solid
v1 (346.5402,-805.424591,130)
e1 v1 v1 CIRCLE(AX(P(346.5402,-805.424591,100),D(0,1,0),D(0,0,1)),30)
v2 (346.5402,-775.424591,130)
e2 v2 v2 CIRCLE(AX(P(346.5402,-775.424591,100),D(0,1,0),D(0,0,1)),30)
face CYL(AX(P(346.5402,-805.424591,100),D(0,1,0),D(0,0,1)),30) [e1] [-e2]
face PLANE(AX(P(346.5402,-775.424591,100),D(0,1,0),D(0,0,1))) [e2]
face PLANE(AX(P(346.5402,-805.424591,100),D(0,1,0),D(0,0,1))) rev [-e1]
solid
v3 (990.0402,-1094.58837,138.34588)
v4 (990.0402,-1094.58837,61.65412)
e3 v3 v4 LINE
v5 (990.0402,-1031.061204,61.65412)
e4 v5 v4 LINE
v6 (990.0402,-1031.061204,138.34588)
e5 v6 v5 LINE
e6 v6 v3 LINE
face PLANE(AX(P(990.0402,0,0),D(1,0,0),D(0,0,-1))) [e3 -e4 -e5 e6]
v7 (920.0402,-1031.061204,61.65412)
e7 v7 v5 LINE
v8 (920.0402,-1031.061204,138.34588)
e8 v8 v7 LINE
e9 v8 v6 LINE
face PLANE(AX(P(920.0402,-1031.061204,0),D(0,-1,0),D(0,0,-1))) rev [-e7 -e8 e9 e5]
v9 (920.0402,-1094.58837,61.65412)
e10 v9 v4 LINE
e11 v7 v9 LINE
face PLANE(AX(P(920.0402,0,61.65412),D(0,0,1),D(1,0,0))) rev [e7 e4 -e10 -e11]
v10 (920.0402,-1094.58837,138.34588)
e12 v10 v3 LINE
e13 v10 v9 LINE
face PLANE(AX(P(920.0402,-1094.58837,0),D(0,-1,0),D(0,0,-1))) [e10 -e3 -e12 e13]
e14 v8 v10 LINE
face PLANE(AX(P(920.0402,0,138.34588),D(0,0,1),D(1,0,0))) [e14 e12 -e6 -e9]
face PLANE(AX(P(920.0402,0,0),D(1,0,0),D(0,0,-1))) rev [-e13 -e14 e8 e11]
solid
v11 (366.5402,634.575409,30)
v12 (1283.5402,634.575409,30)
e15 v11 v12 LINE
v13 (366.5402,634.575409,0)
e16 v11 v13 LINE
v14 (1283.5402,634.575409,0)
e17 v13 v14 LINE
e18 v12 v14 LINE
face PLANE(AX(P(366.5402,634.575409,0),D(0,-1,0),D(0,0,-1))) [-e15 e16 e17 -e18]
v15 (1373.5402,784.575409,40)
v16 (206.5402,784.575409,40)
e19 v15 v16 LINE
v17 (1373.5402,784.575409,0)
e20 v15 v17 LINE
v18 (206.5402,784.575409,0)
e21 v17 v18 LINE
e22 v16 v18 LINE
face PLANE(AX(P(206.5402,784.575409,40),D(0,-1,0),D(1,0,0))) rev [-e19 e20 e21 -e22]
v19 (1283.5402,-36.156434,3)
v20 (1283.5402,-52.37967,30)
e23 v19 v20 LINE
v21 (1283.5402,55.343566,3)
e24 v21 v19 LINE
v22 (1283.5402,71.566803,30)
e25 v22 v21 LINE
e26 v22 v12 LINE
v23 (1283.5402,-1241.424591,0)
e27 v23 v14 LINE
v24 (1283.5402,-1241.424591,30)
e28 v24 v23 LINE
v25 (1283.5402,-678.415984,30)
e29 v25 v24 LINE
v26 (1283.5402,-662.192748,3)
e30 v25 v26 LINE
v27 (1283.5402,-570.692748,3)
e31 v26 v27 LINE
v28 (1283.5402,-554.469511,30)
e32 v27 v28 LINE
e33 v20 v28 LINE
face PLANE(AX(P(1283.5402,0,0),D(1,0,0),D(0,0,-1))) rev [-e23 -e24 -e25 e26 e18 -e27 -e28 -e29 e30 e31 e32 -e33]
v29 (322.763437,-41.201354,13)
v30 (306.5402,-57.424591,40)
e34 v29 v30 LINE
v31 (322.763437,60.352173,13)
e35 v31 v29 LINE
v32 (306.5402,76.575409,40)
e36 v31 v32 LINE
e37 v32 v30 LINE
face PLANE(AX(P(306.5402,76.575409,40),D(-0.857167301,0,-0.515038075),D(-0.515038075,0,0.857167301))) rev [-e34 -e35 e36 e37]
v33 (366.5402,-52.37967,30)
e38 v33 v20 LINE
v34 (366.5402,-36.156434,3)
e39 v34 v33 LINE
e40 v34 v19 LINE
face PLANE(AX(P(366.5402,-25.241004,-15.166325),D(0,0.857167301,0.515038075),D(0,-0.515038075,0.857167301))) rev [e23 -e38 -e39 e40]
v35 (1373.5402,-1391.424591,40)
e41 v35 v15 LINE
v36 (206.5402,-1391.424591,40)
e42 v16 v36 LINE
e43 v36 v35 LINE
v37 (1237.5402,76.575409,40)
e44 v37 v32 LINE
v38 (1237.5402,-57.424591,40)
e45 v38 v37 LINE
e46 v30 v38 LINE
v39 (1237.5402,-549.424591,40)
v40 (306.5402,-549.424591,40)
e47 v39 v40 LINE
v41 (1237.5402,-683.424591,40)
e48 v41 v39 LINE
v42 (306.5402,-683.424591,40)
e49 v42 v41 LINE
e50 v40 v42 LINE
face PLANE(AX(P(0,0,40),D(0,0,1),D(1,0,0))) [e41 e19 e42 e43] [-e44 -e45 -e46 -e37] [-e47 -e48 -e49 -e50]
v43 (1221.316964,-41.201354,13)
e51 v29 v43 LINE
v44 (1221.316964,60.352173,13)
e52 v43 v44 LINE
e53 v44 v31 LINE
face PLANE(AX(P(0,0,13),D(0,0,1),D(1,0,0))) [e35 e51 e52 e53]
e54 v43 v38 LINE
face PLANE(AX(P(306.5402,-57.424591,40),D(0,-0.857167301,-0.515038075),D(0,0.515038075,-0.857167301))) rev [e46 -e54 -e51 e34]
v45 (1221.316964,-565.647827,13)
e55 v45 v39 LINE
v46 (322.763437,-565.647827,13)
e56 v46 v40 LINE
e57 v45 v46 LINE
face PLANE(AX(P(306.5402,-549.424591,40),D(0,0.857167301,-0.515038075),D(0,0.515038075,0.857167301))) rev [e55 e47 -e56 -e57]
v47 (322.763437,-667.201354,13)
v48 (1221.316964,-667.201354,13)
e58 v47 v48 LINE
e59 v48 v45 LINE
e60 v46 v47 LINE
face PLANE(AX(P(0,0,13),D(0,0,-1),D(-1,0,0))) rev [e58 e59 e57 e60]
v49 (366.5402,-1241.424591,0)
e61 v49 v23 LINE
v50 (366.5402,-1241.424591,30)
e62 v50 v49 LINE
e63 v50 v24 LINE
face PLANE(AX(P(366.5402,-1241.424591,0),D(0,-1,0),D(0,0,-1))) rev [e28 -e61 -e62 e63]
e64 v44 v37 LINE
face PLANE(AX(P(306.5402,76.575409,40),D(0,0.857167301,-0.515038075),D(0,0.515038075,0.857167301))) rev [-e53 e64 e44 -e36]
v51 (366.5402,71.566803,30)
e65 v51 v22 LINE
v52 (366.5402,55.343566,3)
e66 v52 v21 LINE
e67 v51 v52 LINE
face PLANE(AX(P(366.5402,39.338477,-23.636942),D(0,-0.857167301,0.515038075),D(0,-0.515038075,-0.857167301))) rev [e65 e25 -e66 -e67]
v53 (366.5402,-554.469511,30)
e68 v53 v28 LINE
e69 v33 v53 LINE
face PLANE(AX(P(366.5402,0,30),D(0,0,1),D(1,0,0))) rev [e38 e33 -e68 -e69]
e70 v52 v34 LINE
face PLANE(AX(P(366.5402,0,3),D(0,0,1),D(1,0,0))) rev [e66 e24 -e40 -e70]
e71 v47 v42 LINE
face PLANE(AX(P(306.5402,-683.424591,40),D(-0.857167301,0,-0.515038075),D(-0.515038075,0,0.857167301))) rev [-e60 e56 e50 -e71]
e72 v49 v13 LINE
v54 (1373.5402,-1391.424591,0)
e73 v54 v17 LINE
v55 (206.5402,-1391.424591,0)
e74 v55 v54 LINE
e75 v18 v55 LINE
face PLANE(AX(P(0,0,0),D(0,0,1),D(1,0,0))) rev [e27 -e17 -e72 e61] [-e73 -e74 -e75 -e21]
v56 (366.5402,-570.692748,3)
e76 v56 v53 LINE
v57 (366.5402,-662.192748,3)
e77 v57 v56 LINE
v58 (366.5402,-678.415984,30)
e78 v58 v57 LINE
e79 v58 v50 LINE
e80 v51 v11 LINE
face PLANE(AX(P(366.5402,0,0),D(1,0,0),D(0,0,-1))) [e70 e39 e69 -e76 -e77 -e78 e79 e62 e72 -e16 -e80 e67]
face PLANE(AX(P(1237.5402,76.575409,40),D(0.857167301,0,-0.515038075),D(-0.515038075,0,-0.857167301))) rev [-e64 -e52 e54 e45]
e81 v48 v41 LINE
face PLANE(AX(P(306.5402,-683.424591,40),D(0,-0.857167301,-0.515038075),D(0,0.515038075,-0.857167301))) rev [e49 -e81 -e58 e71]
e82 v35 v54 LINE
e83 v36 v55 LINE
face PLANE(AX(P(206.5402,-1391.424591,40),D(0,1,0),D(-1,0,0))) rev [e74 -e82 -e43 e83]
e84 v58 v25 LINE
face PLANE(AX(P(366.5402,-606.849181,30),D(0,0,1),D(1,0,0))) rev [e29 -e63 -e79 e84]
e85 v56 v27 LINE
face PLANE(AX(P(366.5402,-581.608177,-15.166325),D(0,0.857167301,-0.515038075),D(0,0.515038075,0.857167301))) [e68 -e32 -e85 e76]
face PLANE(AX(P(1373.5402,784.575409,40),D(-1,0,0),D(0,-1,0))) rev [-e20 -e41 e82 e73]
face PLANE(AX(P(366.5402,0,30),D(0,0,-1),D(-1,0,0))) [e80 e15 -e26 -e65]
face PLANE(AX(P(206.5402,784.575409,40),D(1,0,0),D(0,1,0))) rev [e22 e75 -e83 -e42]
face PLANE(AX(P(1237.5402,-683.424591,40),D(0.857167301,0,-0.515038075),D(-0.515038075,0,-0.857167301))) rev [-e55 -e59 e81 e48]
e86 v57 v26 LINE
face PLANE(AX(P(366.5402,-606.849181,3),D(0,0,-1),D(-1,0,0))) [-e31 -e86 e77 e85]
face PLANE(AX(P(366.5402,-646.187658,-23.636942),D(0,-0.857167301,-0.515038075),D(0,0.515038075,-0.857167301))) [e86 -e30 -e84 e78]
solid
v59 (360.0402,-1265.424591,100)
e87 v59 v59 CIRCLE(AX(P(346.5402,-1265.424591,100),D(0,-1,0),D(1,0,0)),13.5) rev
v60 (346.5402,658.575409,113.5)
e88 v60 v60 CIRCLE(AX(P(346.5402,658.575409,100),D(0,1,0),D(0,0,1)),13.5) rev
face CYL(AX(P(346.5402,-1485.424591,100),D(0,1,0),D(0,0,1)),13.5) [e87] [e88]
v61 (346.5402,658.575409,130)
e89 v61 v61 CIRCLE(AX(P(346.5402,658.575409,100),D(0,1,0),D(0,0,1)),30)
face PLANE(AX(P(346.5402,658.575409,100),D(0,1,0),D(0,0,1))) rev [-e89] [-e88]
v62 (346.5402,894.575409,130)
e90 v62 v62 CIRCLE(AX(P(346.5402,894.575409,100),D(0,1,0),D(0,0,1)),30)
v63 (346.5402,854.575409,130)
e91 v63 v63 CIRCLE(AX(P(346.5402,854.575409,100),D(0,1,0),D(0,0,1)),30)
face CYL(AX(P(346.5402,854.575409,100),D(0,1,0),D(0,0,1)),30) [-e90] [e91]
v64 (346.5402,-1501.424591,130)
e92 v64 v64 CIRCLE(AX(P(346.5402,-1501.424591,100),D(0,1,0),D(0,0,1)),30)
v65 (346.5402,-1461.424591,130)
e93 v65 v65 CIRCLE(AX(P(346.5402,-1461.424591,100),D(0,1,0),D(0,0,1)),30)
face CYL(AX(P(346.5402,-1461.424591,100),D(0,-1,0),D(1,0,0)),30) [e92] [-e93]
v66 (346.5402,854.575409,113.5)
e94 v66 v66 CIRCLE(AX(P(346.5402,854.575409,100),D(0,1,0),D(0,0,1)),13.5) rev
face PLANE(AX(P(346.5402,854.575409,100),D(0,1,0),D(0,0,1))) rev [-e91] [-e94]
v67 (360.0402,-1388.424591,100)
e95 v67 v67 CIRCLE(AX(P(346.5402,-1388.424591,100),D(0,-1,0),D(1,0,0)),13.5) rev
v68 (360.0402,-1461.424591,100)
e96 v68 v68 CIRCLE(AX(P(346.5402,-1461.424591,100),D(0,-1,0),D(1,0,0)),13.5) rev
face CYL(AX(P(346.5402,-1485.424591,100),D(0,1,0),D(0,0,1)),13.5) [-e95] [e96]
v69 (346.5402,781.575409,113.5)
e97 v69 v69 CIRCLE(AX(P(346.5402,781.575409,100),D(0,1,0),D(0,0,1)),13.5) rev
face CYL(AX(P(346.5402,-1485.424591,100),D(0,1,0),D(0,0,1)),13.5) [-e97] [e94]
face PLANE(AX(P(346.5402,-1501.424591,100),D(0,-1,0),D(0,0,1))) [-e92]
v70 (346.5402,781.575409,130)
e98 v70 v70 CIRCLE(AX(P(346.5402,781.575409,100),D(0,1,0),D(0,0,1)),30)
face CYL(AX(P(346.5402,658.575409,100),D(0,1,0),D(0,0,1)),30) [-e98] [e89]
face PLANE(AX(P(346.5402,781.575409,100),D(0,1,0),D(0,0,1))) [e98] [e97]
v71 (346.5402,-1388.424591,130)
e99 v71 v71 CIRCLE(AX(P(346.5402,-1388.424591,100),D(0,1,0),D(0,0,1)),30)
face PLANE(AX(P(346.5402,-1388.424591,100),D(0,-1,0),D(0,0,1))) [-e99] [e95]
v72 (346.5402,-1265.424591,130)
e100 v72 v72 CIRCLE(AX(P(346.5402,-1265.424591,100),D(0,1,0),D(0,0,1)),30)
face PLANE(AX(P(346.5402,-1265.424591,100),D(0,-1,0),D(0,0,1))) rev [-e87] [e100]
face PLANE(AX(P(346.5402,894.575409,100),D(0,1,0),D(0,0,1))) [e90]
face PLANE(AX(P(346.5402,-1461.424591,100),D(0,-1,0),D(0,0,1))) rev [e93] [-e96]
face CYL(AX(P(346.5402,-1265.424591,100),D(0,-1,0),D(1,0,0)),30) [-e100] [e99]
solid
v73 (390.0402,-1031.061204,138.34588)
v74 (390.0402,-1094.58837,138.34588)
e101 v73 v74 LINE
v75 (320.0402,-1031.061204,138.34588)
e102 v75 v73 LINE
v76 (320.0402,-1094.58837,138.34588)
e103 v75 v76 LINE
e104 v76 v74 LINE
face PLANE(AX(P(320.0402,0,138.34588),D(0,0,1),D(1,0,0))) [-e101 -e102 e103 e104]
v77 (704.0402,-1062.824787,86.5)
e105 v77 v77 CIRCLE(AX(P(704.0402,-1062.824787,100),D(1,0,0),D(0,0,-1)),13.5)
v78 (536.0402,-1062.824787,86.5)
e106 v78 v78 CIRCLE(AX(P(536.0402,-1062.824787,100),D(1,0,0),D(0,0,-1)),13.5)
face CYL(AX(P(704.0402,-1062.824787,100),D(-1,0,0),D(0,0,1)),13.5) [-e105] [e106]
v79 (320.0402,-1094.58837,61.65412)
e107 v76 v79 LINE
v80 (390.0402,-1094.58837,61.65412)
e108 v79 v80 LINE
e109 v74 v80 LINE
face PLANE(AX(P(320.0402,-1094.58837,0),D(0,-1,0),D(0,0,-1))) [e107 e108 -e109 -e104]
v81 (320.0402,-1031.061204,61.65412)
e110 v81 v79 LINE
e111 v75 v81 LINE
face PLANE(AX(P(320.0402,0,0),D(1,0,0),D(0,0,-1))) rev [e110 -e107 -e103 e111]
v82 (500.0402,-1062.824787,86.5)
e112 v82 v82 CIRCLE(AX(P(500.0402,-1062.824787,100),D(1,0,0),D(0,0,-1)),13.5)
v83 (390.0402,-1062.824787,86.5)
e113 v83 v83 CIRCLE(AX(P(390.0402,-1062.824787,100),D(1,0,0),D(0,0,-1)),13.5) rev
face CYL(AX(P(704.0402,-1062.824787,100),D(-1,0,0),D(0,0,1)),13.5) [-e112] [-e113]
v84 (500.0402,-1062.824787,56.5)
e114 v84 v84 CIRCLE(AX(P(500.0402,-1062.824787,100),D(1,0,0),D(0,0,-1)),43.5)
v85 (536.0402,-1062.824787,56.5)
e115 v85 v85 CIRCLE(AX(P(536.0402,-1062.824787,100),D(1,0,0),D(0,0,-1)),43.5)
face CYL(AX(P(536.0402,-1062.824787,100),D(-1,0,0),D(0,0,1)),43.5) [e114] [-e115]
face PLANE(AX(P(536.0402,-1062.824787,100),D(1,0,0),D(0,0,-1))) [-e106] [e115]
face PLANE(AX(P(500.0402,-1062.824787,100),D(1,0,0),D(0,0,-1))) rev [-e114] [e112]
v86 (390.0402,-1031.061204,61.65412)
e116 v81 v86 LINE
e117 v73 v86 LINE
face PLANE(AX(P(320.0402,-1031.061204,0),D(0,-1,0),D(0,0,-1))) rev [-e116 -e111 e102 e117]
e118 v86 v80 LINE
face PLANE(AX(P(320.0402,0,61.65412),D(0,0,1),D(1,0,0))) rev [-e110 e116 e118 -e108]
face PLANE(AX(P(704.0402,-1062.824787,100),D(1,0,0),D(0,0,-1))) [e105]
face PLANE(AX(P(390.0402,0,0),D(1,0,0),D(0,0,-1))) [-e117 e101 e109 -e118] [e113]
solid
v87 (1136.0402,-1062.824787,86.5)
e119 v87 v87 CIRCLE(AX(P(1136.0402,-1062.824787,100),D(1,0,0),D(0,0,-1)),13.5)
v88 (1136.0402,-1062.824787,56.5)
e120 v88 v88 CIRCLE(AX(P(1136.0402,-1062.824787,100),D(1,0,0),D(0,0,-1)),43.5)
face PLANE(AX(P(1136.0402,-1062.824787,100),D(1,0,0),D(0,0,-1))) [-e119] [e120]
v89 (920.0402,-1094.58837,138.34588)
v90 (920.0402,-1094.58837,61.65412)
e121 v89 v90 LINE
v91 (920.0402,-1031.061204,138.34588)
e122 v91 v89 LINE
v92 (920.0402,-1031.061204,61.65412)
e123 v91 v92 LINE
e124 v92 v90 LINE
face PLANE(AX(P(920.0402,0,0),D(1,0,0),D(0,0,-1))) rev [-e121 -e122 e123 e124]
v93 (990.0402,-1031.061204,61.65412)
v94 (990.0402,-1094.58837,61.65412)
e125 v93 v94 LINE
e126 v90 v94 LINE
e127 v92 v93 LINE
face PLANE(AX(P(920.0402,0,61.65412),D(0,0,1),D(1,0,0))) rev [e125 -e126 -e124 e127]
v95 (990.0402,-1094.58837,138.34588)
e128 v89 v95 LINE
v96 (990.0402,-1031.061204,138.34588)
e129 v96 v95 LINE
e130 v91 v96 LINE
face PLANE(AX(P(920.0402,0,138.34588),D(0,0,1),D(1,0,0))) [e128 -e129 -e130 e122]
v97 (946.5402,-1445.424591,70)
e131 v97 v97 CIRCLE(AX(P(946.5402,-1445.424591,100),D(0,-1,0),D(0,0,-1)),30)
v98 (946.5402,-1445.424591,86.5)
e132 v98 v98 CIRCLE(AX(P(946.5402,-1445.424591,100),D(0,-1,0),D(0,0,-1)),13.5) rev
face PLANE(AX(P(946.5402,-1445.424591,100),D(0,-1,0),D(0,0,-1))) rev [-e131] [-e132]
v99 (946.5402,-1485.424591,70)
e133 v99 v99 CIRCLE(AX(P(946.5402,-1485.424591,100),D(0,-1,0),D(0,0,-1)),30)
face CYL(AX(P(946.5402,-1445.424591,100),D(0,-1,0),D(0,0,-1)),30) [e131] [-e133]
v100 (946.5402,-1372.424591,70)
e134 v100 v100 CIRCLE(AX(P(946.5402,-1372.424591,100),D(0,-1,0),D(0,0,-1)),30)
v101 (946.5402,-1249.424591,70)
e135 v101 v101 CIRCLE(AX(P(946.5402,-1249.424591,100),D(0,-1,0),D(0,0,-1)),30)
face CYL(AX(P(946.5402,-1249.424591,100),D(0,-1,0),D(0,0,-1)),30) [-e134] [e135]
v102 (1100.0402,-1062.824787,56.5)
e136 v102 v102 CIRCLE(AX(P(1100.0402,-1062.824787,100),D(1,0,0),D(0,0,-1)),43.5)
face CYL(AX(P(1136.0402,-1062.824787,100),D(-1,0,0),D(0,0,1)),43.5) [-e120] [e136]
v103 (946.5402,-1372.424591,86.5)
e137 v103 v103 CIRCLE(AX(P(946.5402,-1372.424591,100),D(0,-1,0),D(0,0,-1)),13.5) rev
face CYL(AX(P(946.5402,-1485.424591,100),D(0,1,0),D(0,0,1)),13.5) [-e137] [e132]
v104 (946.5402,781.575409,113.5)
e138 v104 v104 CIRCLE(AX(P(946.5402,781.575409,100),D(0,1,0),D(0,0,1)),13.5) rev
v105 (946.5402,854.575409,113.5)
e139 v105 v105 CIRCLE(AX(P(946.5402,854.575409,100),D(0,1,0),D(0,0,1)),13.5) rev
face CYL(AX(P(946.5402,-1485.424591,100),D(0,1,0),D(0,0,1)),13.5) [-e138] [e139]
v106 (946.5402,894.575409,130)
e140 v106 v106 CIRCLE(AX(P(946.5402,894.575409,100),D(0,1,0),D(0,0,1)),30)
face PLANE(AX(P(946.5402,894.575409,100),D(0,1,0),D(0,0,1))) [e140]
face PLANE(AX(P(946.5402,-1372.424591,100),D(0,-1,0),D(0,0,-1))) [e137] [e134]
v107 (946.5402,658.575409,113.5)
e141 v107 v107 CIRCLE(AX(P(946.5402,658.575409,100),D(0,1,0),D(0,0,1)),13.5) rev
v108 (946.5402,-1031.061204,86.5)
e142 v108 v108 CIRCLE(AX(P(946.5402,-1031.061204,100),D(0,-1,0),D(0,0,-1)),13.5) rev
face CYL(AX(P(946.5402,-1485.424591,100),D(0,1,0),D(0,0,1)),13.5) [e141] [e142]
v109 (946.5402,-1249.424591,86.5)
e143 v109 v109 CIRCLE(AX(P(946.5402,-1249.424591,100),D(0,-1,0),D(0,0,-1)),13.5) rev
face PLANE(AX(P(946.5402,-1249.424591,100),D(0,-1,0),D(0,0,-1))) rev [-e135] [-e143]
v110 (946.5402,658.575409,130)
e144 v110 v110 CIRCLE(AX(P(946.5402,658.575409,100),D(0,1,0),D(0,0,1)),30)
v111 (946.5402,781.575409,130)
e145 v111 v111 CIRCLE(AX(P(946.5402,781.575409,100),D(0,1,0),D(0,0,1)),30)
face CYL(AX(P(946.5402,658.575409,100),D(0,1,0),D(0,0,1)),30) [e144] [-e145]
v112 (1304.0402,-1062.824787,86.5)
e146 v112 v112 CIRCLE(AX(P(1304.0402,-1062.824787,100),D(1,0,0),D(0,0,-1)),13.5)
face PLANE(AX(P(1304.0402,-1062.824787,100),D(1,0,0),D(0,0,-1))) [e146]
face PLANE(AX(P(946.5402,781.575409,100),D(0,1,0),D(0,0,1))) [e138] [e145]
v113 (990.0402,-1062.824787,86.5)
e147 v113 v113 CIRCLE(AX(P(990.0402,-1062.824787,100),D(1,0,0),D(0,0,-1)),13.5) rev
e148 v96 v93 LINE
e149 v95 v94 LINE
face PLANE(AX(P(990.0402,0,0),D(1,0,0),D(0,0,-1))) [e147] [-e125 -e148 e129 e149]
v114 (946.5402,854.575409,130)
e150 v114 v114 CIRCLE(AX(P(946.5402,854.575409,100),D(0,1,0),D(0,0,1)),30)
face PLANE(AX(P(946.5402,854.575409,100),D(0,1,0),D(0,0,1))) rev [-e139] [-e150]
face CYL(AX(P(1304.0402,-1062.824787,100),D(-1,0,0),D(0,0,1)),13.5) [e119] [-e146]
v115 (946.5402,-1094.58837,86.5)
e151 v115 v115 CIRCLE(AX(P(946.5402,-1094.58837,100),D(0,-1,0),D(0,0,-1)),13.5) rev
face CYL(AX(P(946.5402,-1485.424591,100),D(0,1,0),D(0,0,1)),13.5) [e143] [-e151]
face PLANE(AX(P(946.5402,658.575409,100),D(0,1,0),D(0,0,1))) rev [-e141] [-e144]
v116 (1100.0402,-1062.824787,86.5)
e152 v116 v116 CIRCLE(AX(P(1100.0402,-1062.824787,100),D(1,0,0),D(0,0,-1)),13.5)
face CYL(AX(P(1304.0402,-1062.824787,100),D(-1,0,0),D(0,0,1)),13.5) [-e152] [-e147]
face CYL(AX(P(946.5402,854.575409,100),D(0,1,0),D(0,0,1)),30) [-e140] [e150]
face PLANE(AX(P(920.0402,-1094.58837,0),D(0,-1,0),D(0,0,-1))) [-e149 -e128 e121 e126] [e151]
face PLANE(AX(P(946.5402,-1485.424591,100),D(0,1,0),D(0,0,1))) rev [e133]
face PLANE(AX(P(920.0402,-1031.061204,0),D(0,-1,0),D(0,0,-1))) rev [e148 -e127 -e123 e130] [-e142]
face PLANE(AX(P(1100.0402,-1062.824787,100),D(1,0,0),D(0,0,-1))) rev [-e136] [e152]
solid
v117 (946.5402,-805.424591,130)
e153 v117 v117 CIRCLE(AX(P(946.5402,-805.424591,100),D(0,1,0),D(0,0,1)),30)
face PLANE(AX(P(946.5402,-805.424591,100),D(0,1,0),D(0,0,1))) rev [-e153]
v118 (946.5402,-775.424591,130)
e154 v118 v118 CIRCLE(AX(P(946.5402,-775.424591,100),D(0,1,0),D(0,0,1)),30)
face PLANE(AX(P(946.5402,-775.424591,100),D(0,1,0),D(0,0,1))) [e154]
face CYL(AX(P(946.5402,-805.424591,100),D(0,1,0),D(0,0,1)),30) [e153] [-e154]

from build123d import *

# Parameters (mm, degrees)
SKETCH1_W                    = 1167
SKETCH1_H                    = 2176
BOSS_EXTRUDE1_DEPTH          = 40
SKETCH2_W                    = 931
SKETCH2_H                    = 134
CUT_EXTRUDE1_DEPTH           = 27
CUT_EXTRUDE1_DRAFT           = -31
CUT_EXTRUDE1_PROFILE_2_DEPTH = 27
CUT_EXTRUDE1_PROFILE_2_DRAFT = -31
CUT_EXTRUDE2_START           = -90
CUT_EXTRUDE2_DEPTH           = 917
BOSS_EXTRUDE2_START          = 110
SKETCH4_R                    = 13.5
BOSS_EXTRUDE2_DEPTH          = 2380
SKETCH5_R                    = 30
BOSS_EXTRUDE3_DEPTH          = 40
BOSS_EXTRUDE4_START          = -113
SKETCH6_R                    = 30
BOSS_EXTRUDE4_DEPTH          = 123
BOSS_EXTRUDE5_START          = -40
SKETCH8_W                    = 76.691760354
SKETCH8_H                    = 63.527166665
BOSS_EXTRUDE5_DEPTH          = 70
SKETCH9_R                    = 13.5
BOSS_EXTRUDE6_DEPTH          = 344
BOSS_EXTRUDE7_START          = 140
SKETCH10_R                   = 43.5
BOSS_EXTRUDE7_DEPTH          = 36
BOSS_EXTRUDE8_START          = -1670
SKETCH11_R                   = 30
BOSS_EXTRUDE8_DEPTH          = 30
LPATTERN2_COUNT              = 2
LPATTERN2_PITCH              = 600
LPATTERN3_START              = -805.424590627
LPATTERN3_OUTLINE_R          = 30
LPATTERN3_DEPTH              = 30
LPATTERN3_START_2            = 61.654119823
LPATTERN3_2_OUTLINE_W        = 70
LPATTERN3_2_OUTLINE_H        = 63.527166665
LPATTERN3_2_DEPTH            = 76.691760354
LPATTERN3_START_3            = 920.040200233
LPATTERN3_3_OUTLINE_W        = 63.527166665
LPATTERN3_3_OUTLINE_H        = 76.691760354
LPATTERN3_3_DEPTH            = 70
LPATTERN3_START_4            = 1100.040200233
LPATTERN3_4_OUTLINE_R        = 43.5
LPATTERN3_4_DEPTH            = 36
LPATTERN3_START_5            = 990.040200233
LPATTERN3_5_OUTLINE_R        = 13.5
LPATTERN3_5_DEPTH            = 314
LPATTERN3_START_6            = 658.575409373
LPATTERN3_6_OUTLINE_R        = 30
LPATTERN3_6_DEPTH            = 123
LPATTERN3_START_7            = 854.575409373
LPATTERN3_7_OUTLINE_R        = 30
LPATTERN3_7_DEPTH            = 40
SKETCH12_R                   = 30
BOSS_EXTRUDE9_DEPTH          = 40
BOSS_EXTRUDE10_START         = -113
SKETCH13_R                   = 30
BOSS_EXTRUDE10_DEPTH         = 123


# Read off the part's stored shape, not the designer's step: LPattern3
with BuildPart() as part:
    # Sketch1 → Boss-Extrude1 (new body)
    with BuildSketch(Plane.XY):
        with Locations((790.040200233, -303.424590627)):
            Rectangle(SKETCH1_W, SKETCH1_H)
    extrude(amount=BOSS_EXTRUDE1_DEPTH)


with BuildPart() as cut_extrude1_tool:
    # Sketch2 → Cut-Extrude1 (with draft: the straight prism first)
    with BuildSketch(Plane.XY.offset(40)):
        with Locations((772.040200233, 9.575409373)):
            Rectangle(SKETCH2_W, SKETCH2_H)
    extrude(amount=-CUT_EXTRUDE1_DEPTH)
    # Cut-Extrude1: the draft: its side faces are tilted about the plane it starts from
    cut_extrude1_sides = [cut_extrude1_tool.faces().sort_by_distance(p)[0] for p in [
        (306.540200233, 9.575409373, 26.5),
        (772.040200233, -57.424590627, 26.5),
        (1237.540200233, 9.575409373, 26.5),
        (772.040200233, 76.575409373, 26.5),
    ]]
    draft(cut_extrude1_sides, Plane.XY.offset(40), CUT_EXTRUDE1_DRAFT)


with BuildPart() as part_1:
    add(part.part)

    # Cut-Extrude1: cut by cut_extrude1_tool
    add(cut_extrude1_tool.part, mode=Mode.SUBTRACT)


with BuildPart() as cut_extrude1_profile_2_tool:
    # Sketch2 → Cut-Extrude1 profile 2 (with draft: the straight prism first)
    with BuildSketch(Plane.XY.offset(40)):
        with Locations((772.040200233, -616.424590627)):
            Rectangle(SKETCH2_W, SKETCH2_H)
    extrude(amount=-CUT_EXTRUDE1_PROFILE_2_DEPTH)
    # Cut-Extrude1 profile 2: the draft: its side faces are tilted about the plane it starts from
    cut_extrude1_profile_2_sides = [cut_extrude1_profile_2_tool.faces().sort_by_distance(p)[0] for p in [
        (306.540200233, -616.424590627, 26.5),
        (772.040200233, -683.424590627, 26.5),
        (1237.540200233, -616.424590627, 26.5),
        (772.040200233, -549.424590627, 26.5),
    ]]
    draft(cut_extrude1_profile_2_sides, Plane.XY.offset(40), CUT_EXTRUDE1_PROFILE_2_DRAFT)


with BuildPart() as part_2:
    add(part_1.part)

    # Cut-Extrude1 profile 2: cut by cut_extrude1_profile_2_tool
    add(cut_extrude1_profile_2_tool.part, mode=Mode.SUBTRACT)

    # Sketch3 → Cut-Extrude2 (cut)
    with BuildSketch(Plane(origin=(1373.540200233, 0, 0), x_dir=(0, 0, -1), z_dir=(1, 0, 0)).offset(CUT_EXTRUDE2_START)):
        Polygon((-30, 634.575409373), (-30, 71.566803182), (-3, 55.343566469), (-3, -36.156433531), (-30, -52.379670245), (-30, -340.424590627), (0, -340.424590627), (0, 634.575409373), align=None)
    cut_extrude2 = extrude(amount=-CUT_EXTRUDE2_DEPTH, mode=Mode.SUBTRACT)

    # Mirror1: Cut-Extrude2 across plane
    add(cut_extrude2.mirror(Plane.ZX.offset(-303.424590627)), mode=Mode.SUBTRACT)


with BuildPart() as body_2:
    # Sketch4 → Boss-Extrude2 (new body)
    with BuildSketch(Plane(origin=(0, 784.575409373, 0), x_dir=(1, 0, 0), z_dir=(0, 1, 0)).offset(BOSS_EXTRUDE2_START)):
        with Locations(Location((346.540200233, -100, 0), (0, 0, 270))):
            Circle(SKETCH4_R)
    boss_extrude2 = extrude(amount=-BOSS_EXTRUDE2_DEPTH)

    # Sketch5 → Boss-Extrude3 (add)
    with BuildSketch(Plane(origin=(0, 894.575409373, 0), x_dir=(1, 0, 0), z_dir=(0, 1, 0))):
        with Locations(Location((346.540200233, -100, 0), (0, 0, 270))):
            Circle(SKETCH5_R)
    boss_extrude3 = extrude(amount=-BOSS_EXTRUDE3_DEPTH)

    # Sketch6 → Boss-Extrude4 (add)
    with BuildSketch(Plane(origin=(0, 894.575409373, 0), x_dir=(1, 0, 0), z_dir=(0, 1, 0)).offset(BOSS_EXTRUDE4_START)):
        with Locations(Location((346.540200233, -100, 0), (0, 0, 270))):
            Circle(SKETCH6_R)
    boss_extrude4 = extrude(amount=-BOSS_EXTRUDE4_DEPTH)

    # Mirror2: Boss-Extrude3, Boss-Extrude4 across plane
    add(boss_extrude3.mirror(Plane.ZX.offset(-303.424590627)))
    add(boss_extrude4.mirror(Plane.ZX.offset(-303.424590627)))


with BuildPart() as body_3:
    # Sketch8 → Boss-Extrude5 (new body)
    with BuildSketch(Plane(origin=(360.040200233, 0, 0), x_dir=(0, 0, -1), z_dir=(1, 0, 0)).offset(BOSS_EXTRUDE5_START)):
        with Locations((-100, -1062.824787132)):
            Rectangle(SKETCH8_W, SKETCH8_H)
    extrude(amount=BOSS_EXTRUDE5_DEPTH)

    # Sketch9 → Boss-Extrude6 (add)
    with BuildSketch(Plane(origin=(360.040200233, 0, 0), x_dir=(0, 0, -1), z_dir=(1, 0, 0))):
        with Locations((-100, -1062.824787132)):
            Circle(SKETCH9_R)
    extrude(amount=BOSS_EXTRUDE6_DEPTH)

    # Sketch10 → Boss-Extrude7 (add)
    with BuildSketch(Plane(origin=(360.040200233, 0, 0), x_dir=(0, 0, -1), z_dir=(1, 0, 0)).offset(BOSS_EXTRUDE7_START)):
        with Locations((-100, -1062.824787132)):
            Circle(SKETCH10_R)
    extrude(amount=BOSS_EXTRUDE7_DEPTH)


with BuildPart() as body_4:
    # Sketch11 → Boss-Extrude8 (new body)
    with BuildSketch(Plane(origin=(0, 894.575409373, 0), x_dir=(1, 0, 0), z_dir=(0, 1, 0)).offset(BOSS_EXTRUDE8_START)):
        with Locations(Location((346.540200233, -100, 0), (0, 0, 270))):
            Circle(SKETCH11_R)
    extrude(amount=-BOSS_EXTRUDE8_DEPTH)


with BuildPart() as lpattern2_1:
    # LPattern2: Boss-Extrude2 ×2
    with Locations(*[(i * LPATTERN2_PITCH, 0, 0) for i in range(1, LPATTERN2_COUNT)]):
        add(boss_extrude2)

    # LPattern3 3 outline → LPattern3 3 (add)
    with BuildSketch(Plane.YZ.offset(LPATTERN3_START_3)):
        with Locations((-1062.824787132, 100)):
            Rectangle(LPATTERN3_3_OUTLINE_W, LPATTERN3_3_OUTLINE_H)
    extrude(amount=LPATTERN3_3_DEPTH)

    # LPattern3 4 outline → LPattern3 4 (add)
    with BuildSketch(Plane.YZ.offset(LPATTERN3_START_4)):
        with Locations((-1062.824787132, 100)):
            Circle(LPATTERN3_4_OUTLINE_R)
    extrude(amount=LPATTERN3_4_DEPTH)

    # LPattern3 5 outline → LPattern3 5 (add)
    with BuildSketch(Plane.YZ.offset(LPATTERN3_START_5)):
        with Locations((-1062.824787132, 100)):
            Circle(LPATTERN3_5_OUTLINE_R)
    extrude(amount=LPATTERN3_5_DEPTH)

    # LPattern3 6 outline → LPattern3 6 (add)
    with BuildSketch(Plane(origin=(0, 0, 0), x_dir=(1, 0, 0), z_dir=(0, 1, 0)).offset(LPATTERN3_START_6)):
        with Locations((946.540200233, -100)):
            Circle(LPATTERN3_6_OUTLINE_R)
    extrude(amount=LPATTERN3_6_DEPTH)

    # LPattern3 7 outline → LPattern3 7 (add)
    with BuildSketch(Plane(origin=(0, 0, 0), x_dir=(1, 0, 0), z_dir=(0, 1, 0)).offset(LPATTERN3_START_7)):
        with Locations((946.540200233, -100)):
            Circle(LPATTERN3_7_OUTLINE_R)
    extrude(amount=LPATTERN3_7_DEPTH)

    # Sketch12 → Boss-Extrude9 (add)
    with BuildSketch(Plane(origin=(0, -1485.424590627, 0), x_dir=(-1, 0, 0), z_dir=(0, -1, 0))):
        with Locations(Location((-946.540200233, -100, 0), (0, 0, 270))):
            Circle(SKETCH12_R)
    extrude(amount=-BOSS_EXTRUDE9_DEPTH)

    # Sketch13 → Boss-Extrude10 (add)
    with BuildSketch(Plane(origin=(0, -1485.424590627, 0), x_dir=(-1, 0, 0), z_dir=(0, -1, 0)).offset(BOSS_EXTRUDE10_START)):
        with Locations(Location((-946.540200233, -100, 0), (0, 0, 270))):
            Circle(SKETCH13_R)
    extrude(amount=-BOSS_EXTRUDE10_DEPTH)


with BuildPart() as body_6:
    # LPattern3 outline → LPattern3 (new body)
    with BuildSketch(Plane(origin=(0, 0, 0), x_dir=(1, 0, 0), z_dir=(0, 1, 0)).offset(LPATTERN3_START)):
        with Locations((946.540200233, -100)):
            Circle(LPATTERN3_OUTLINE_R)
    extrude(amount=LPATTERN3_DEPTH)


with BuildPart() as body_7:
    # LPattern3 2 outline → LPattern3 2 (new body)
    with BuildSketch(Plane.XY.offset(LPATTERN3_START_2)):
        with Locations((955.040200233, -1062.824787132)):
            Rectangle(LPATTERN3_2_OUTLINE_W, LPATTERN3_2_OUTLINE_H)
    extrude(amount=LPATTERN3_2_DEPTH)


solid = Compound([part_2.part, body_2.part, body_3.part, body_4.part, lpattern2_1.part, body_6.part, body_7.part])
